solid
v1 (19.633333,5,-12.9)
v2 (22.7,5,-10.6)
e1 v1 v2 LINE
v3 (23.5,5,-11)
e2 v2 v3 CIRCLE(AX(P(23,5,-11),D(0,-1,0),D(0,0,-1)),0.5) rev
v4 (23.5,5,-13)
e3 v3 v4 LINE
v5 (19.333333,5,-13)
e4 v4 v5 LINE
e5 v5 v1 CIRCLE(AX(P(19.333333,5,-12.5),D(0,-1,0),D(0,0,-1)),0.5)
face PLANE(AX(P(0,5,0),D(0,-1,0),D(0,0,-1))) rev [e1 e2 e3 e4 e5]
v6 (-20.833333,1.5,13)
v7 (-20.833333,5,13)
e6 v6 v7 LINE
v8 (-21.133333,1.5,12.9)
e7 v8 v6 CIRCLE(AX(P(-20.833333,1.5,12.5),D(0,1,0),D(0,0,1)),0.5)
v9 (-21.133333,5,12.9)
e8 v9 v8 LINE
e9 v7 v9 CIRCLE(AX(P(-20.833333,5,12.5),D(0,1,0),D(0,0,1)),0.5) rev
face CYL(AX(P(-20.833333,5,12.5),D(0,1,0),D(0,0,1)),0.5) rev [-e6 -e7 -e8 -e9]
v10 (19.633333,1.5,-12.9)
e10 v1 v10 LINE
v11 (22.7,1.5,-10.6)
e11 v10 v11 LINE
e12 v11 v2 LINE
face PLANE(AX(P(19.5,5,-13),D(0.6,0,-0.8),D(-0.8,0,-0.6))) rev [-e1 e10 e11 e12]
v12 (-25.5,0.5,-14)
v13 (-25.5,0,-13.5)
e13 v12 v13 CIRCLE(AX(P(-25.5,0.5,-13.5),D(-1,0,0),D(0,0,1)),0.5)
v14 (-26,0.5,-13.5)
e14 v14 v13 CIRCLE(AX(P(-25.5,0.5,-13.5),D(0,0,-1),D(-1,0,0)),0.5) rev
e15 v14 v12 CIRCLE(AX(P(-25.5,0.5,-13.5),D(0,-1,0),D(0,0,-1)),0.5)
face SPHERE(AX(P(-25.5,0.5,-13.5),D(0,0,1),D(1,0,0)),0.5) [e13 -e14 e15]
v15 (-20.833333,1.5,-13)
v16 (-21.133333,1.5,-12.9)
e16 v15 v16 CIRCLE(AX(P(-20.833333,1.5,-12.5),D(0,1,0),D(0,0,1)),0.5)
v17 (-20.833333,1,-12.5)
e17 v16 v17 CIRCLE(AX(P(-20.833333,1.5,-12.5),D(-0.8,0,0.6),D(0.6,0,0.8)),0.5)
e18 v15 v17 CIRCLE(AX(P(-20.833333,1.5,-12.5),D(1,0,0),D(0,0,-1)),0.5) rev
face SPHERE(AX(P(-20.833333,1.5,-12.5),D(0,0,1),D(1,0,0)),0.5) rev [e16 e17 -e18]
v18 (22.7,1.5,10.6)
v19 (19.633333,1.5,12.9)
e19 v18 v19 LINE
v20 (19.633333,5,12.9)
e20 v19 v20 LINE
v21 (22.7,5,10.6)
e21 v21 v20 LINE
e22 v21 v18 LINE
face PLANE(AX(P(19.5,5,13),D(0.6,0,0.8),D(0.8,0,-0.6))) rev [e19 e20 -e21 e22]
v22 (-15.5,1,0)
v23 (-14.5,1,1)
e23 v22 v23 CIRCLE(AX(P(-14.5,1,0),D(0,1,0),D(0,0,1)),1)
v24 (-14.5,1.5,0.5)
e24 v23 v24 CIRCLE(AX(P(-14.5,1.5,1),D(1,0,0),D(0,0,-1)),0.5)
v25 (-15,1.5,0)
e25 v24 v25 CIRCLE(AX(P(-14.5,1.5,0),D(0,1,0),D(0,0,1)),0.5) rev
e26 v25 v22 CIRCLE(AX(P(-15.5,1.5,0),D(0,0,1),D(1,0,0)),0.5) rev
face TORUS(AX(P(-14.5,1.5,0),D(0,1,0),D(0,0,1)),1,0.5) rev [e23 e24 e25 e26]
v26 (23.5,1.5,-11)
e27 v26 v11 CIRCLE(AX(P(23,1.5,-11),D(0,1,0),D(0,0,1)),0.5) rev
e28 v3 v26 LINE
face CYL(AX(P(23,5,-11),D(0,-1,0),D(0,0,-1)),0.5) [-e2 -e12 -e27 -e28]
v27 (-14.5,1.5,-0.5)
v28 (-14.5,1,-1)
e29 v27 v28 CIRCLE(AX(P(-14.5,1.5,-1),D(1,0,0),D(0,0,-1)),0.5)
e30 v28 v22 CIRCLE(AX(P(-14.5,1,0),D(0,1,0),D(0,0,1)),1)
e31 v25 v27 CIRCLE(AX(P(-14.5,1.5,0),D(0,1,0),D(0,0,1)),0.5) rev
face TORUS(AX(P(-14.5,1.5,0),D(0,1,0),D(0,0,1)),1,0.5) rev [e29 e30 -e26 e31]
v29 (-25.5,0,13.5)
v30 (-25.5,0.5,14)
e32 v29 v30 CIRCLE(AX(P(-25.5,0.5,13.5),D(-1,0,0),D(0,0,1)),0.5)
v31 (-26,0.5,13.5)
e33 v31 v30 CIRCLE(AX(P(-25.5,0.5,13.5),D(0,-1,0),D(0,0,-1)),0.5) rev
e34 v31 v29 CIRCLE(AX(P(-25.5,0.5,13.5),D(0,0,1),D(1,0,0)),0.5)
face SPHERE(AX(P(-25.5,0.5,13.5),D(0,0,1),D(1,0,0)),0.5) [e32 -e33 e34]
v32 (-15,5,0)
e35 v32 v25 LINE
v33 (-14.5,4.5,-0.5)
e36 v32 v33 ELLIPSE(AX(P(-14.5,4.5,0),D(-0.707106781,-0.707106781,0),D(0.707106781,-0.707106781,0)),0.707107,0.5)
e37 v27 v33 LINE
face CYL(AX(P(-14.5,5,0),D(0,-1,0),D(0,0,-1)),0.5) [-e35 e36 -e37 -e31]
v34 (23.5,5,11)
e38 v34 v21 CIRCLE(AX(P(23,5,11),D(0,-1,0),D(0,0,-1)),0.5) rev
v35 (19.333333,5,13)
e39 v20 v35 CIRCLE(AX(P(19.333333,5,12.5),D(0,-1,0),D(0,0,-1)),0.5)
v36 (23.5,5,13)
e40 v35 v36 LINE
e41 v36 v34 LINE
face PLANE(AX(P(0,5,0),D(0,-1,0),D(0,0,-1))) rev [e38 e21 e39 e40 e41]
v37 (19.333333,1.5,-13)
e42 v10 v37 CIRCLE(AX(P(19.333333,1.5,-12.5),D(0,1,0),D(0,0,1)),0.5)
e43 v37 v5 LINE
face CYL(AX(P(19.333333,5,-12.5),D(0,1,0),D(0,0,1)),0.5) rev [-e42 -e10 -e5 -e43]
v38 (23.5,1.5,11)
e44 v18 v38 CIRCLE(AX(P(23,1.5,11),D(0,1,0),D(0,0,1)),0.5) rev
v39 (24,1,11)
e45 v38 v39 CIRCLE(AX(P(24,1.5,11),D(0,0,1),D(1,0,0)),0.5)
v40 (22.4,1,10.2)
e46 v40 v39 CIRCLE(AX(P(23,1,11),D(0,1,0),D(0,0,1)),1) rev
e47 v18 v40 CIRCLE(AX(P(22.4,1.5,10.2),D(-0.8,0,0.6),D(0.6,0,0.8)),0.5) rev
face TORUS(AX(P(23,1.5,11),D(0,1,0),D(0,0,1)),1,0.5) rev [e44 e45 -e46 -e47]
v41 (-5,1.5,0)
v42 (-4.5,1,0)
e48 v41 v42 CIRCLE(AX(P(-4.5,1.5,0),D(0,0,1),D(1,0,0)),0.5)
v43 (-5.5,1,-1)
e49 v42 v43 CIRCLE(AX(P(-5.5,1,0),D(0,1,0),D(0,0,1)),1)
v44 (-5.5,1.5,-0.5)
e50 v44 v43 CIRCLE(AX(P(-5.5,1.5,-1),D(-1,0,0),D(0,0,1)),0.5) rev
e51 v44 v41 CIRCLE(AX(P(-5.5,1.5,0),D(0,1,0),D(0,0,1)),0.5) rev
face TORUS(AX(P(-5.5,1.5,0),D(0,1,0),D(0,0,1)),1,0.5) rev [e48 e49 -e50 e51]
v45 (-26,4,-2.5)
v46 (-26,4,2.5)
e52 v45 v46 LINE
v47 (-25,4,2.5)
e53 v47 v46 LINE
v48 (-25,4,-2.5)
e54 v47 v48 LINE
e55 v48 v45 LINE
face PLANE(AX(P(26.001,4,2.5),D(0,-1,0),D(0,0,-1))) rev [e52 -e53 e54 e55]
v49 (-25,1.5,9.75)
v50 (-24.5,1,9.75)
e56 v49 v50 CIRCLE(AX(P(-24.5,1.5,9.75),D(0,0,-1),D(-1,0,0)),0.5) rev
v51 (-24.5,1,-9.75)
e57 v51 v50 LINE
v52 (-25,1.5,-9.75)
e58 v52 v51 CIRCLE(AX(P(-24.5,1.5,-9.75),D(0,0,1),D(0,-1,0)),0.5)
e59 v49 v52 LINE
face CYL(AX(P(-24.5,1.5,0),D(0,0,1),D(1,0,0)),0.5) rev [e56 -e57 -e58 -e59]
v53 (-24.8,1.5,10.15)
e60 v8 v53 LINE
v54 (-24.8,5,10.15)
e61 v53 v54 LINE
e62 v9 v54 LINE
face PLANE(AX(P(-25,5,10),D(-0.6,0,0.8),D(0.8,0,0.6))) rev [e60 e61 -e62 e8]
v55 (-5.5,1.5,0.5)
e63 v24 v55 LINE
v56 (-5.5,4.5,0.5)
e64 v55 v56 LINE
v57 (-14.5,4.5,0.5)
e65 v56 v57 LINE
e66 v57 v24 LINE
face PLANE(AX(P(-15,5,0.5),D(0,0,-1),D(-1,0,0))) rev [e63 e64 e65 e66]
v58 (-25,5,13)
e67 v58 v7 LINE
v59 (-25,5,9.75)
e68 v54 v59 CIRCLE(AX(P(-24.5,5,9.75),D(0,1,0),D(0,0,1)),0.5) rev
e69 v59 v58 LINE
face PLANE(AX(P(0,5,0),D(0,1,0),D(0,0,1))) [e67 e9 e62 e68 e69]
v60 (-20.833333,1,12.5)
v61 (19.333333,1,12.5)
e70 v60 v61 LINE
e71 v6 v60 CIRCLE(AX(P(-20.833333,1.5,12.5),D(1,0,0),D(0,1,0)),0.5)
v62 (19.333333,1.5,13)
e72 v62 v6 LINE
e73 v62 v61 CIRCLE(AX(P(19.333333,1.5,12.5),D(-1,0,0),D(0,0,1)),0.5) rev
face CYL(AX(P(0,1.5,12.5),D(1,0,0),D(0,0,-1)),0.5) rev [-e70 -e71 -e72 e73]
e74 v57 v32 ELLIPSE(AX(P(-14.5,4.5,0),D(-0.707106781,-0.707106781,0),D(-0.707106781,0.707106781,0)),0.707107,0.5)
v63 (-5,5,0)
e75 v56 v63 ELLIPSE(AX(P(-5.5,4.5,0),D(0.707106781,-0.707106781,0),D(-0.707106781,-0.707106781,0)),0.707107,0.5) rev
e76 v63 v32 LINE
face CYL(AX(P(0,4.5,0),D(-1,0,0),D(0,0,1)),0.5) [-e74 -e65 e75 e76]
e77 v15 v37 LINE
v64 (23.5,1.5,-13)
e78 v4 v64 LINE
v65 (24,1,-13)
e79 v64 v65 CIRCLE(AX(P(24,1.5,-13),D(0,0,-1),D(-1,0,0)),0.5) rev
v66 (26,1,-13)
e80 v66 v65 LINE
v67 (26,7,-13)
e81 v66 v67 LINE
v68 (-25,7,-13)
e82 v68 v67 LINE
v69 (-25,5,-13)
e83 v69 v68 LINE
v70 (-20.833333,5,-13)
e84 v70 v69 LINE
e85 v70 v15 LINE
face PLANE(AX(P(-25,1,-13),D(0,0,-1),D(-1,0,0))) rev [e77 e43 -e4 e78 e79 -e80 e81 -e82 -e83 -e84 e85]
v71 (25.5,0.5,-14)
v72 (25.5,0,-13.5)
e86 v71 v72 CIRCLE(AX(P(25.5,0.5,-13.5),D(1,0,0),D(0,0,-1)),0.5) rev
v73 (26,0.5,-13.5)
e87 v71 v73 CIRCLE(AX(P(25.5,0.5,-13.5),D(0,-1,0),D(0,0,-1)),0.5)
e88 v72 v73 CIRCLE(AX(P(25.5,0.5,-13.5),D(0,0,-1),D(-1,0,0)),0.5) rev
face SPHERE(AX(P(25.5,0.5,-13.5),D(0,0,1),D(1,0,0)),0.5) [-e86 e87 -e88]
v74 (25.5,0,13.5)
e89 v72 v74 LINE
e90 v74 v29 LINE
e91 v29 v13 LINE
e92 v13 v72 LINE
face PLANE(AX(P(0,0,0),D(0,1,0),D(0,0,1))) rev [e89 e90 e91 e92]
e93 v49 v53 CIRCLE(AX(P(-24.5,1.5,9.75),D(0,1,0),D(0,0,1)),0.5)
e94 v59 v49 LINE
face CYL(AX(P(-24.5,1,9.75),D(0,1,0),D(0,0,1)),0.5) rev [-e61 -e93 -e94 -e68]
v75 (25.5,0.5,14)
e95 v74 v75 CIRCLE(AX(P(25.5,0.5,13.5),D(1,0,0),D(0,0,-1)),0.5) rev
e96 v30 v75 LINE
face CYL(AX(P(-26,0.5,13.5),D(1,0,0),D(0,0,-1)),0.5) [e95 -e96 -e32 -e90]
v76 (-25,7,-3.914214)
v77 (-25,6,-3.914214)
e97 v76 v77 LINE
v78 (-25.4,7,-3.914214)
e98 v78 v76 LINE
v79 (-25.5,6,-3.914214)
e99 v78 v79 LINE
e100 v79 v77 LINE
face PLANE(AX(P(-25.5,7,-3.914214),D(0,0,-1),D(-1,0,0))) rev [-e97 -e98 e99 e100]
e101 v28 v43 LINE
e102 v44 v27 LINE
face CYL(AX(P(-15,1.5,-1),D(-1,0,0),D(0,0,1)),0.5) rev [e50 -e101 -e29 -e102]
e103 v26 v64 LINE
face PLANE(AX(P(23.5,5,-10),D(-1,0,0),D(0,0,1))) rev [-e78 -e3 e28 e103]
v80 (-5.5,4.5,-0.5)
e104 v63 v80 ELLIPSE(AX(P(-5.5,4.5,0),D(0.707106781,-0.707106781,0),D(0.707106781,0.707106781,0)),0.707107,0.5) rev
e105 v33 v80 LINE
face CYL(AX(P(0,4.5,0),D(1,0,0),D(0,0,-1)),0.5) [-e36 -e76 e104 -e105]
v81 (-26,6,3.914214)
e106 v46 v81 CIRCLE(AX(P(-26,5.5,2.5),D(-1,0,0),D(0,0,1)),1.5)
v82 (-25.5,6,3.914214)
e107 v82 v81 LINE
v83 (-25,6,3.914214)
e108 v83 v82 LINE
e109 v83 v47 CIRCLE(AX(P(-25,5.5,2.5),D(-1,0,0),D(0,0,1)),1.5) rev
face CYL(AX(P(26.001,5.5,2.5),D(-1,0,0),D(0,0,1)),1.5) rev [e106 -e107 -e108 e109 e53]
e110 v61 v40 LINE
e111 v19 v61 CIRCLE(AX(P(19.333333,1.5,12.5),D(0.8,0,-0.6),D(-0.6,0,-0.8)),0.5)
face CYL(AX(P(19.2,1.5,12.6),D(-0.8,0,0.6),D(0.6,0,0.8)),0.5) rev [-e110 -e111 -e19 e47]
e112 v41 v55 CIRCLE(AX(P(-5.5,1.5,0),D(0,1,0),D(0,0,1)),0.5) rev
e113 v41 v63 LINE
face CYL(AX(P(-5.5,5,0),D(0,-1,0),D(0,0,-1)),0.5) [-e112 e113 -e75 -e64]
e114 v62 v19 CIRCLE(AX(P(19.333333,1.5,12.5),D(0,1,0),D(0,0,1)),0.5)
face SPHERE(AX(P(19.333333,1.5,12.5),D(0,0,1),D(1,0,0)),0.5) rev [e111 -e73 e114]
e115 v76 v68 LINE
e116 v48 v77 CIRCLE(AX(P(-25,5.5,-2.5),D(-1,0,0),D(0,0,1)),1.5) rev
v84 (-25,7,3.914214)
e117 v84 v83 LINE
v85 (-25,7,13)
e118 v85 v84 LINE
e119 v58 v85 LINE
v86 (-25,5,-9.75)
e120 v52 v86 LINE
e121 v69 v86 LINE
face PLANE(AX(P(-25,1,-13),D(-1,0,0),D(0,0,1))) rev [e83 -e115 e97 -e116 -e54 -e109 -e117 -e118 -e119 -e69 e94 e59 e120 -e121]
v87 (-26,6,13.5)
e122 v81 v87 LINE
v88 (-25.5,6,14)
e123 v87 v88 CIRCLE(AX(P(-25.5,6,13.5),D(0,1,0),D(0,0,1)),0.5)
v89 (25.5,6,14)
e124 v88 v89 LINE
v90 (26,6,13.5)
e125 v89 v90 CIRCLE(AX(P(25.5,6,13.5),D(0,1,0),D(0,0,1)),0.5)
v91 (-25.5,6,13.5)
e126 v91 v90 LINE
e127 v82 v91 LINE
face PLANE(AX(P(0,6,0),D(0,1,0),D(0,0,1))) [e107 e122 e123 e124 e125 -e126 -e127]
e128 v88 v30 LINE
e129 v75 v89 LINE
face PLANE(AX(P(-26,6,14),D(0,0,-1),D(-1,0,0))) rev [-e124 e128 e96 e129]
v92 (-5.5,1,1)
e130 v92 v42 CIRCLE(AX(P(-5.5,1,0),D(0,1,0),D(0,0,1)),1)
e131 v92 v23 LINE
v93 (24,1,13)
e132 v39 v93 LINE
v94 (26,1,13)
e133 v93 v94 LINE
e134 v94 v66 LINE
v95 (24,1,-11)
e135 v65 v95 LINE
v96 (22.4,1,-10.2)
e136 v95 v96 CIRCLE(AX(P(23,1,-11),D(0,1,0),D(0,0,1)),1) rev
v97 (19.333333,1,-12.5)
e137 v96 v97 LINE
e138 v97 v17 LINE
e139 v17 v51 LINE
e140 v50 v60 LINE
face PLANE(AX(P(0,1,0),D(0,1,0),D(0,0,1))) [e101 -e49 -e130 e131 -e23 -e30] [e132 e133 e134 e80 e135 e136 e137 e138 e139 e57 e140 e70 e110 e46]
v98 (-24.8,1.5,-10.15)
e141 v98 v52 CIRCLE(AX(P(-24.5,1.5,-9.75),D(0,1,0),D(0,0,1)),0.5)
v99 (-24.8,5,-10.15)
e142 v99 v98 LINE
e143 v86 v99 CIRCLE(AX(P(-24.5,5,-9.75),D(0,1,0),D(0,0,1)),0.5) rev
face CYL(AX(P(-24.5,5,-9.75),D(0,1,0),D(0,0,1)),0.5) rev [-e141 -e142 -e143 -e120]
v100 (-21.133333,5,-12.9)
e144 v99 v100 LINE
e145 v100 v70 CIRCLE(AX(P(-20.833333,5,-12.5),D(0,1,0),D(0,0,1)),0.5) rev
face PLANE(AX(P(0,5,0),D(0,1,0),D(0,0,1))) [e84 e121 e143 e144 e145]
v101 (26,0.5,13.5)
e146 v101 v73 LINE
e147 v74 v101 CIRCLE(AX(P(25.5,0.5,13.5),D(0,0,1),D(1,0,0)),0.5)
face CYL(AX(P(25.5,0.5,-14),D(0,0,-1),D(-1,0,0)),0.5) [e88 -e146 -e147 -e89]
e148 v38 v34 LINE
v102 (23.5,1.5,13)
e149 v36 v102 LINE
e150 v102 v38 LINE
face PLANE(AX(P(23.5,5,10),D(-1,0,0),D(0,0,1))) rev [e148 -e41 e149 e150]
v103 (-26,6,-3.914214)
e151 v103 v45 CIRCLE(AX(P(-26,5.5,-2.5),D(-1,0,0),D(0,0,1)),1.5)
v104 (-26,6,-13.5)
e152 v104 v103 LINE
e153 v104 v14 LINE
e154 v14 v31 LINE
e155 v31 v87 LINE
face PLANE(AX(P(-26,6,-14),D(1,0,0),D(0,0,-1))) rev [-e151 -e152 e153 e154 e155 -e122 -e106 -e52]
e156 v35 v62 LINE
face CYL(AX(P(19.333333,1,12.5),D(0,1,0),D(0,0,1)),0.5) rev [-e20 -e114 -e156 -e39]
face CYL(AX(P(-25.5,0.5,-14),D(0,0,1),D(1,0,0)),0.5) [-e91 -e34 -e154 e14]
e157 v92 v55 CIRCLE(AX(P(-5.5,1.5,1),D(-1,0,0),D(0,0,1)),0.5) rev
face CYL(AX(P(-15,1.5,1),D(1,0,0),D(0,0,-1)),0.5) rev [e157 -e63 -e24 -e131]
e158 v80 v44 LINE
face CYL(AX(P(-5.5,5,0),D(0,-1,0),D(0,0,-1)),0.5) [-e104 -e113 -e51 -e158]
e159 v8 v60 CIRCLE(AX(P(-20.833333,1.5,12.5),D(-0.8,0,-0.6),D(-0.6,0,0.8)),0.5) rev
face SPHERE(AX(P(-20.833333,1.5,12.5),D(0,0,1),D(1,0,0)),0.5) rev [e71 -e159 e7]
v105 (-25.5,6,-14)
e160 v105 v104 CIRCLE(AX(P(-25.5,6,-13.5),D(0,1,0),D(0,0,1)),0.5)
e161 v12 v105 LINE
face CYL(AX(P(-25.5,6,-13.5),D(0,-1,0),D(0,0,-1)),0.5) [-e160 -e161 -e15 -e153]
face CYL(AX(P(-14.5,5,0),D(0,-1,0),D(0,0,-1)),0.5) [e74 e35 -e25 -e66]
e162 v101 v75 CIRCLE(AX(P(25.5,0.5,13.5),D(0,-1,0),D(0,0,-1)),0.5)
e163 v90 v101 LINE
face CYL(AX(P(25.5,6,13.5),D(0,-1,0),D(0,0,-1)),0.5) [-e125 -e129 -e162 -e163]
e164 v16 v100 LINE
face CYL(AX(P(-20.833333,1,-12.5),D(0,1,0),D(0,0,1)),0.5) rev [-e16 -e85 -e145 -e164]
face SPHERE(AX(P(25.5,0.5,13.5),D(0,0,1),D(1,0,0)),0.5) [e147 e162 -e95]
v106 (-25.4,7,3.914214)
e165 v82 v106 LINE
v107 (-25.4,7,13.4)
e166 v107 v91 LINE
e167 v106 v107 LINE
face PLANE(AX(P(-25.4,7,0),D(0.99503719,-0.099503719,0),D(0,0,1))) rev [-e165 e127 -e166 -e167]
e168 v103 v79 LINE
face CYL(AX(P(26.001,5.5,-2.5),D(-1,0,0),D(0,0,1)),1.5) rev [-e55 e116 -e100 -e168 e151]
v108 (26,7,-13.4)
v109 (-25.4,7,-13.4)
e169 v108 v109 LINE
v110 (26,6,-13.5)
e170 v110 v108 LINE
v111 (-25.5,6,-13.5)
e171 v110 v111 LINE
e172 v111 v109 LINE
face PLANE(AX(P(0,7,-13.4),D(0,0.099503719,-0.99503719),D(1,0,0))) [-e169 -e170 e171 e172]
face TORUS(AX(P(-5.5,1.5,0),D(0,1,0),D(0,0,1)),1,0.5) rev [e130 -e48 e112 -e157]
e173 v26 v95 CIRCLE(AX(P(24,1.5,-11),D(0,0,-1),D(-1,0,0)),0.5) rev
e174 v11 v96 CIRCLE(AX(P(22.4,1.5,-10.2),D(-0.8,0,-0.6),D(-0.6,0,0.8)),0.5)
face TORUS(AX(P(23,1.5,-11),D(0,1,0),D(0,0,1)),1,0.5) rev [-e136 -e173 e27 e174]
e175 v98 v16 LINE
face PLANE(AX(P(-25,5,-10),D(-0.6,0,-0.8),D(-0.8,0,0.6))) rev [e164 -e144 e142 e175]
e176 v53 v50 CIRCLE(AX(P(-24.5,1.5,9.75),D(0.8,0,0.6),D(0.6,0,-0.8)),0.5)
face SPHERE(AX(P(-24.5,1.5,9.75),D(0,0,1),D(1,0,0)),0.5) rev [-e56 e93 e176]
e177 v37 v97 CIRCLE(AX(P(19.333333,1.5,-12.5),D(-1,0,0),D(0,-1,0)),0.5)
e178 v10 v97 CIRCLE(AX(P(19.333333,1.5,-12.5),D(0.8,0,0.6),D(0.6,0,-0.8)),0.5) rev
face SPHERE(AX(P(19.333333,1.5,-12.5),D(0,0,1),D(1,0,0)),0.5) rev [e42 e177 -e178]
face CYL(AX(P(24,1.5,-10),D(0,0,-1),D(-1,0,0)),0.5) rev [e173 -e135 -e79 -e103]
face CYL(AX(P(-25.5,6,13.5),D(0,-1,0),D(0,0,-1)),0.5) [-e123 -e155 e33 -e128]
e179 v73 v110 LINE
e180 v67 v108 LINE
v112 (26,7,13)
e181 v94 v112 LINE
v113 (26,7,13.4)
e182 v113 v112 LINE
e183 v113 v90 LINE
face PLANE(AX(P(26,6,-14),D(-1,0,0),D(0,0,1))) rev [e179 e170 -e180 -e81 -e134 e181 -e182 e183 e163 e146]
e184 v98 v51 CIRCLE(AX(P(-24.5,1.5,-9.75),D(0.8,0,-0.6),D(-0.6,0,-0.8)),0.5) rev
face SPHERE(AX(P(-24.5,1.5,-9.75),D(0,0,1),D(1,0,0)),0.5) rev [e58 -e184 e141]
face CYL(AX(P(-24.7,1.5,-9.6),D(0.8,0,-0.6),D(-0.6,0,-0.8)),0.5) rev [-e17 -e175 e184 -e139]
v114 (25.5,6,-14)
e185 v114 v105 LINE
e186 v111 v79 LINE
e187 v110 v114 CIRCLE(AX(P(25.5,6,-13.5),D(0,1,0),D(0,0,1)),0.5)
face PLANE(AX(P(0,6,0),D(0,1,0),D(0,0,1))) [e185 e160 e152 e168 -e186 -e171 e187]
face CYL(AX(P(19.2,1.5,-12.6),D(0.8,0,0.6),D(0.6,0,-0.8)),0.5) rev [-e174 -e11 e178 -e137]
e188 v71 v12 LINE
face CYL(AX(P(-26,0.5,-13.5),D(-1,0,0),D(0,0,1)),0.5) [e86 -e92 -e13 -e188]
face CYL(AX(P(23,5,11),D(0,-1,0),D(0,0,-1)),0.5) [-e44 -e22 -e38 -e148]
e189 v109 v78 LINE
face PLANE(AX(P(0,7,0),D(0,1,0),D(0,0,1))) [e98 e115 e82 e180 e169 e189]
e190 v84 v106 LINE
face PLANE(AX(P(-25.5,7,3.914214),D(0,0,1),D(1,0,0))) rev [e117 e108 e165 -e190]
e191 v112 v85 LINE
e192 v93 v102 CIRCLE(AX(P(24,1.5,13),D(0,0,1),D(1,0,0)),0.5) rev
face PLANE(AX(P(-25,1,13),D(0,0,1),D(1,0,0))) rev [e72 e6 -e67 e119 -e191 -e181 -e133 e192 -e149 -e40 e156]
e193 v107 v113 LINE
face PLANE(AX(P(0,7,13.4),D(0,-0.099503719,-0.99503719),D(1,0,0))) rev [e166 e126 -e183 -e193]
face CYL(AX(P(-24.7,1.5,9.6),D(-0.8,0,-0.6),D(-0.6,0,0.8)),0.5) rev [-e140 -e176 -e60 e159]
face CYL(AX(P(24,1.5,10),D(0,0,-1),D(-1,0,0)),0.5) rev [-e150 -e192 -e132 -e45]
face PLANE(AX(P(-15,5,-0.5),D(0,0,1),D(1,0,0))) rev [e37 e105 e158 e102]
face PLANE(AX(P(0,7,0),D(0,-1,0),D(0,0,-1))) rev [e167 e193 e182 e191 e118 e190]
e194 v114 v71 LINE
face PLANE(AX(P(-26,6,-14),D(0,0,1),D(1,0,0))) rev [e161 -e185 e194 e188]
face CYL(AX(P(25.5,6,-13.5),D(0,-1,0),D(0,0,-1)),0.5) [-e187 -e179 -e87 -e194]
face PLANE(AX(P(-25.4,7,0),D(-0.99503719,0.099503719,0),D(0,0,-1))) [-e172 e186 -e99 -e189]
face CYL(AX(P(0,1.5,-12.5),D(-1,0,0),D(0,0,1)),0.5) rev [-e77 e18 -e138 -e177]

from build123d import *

# Parameters (mm, degrees)
SKETCH_1_W          = 52
SKETCH_1_H          = 28
EXTRUDE_1_DEPTH     = 6
SKETCH_3_W          = 51
SKETCH_3_H          = 26
CUT_EXTRUDE_1_DEPTH = 5
SKETCH_4_W          = 10
SKETCH_4_H          = 1
EXTRUDE_2_DEPTH     = 4
CUT_EXTRUDE_2_REACH = 56.185
FILLET_1_R          = 0.5
EXTRUDE_3_DEPTH     = 1
CHAMFER_1_SIZE      = 0.1
CHAMFER_1_SIZE_2    = 1


# Some blends are built 0.0001 mm under size
with BuildPart() as part:
    # Эскиз1 → Бобышка-Вытянуть1 (new body)
    with BuildSketch(Plane(origin=(0, 0, 0), x_dir=(1, 0, 0), z_dir=(0, 1, 0))):
        Rectangle(SKETCH_1_W, SKETCH_1_H)
    extrude(amount=EXTRUDE_1_DEPTH)

    # Эскиз3 → Вырез-Вытянуть1 (cut)
    with BuildSketch(Plane(origin=(0, 6, 0), x_dir=(1, 0, 0), z_dir=(0, 1, 0))):
        with Locations((0.5, 0)):
            Rectangle(SKETCH_3_W, SKETCH_3_H)
    extrude(amount=-CUT_EXTRUDE_1_DEPTH, mode=Mode.SUBTRACT)

    # Эскиз4 → Бобышка-Вытянуть2 (add)
    with BuildSketch(Plane(origin=(0, 1, 0), x_dir=(1, 0, 0), z_dir=(0, 1, 0))):
        Polygon((19.5, 13), (23.5, 10), (23.5, 13), align=None)
        Polygon((-25, 13), (-25, 10), (-21, 13), align=None)
        Polygon((-21, -13), (-25, -13), (-25, -10), align=None)
        Polygon((23.5, -13), (19.5, -13), (23.5, -10), align=None)
        with Locations((-10, 0)):
            Rectangle(SKETCH_4_W, SKETCH_4_H)
    extrude(amount=EXTRUDE_2_DEPTH)

    # Эскиз5 → Вырез-Вытянуть2 (cut, up to next)
    with BuildSketch(Plane.ZY.offset(26), mode=Mode.PRIVATE) as cut_extrude_2_sk1:
        with BuildLine():
            Line((2.5, 4), (-2.5, 4))
            ThreePointArc((-2.5, 4), (-4, 5.5), (-2.5, 7))
            Line((-2.5, 7), (2.5, 7))
            ThreePointArc((2.5, 7), (4, 5.5), (2.5, 4))
        make_face()
    cut_extrude_2_tool1 = extrude(cut_extrude_2_sk1.sketch, amount=-CUT_EXTRUDE_2_REACH, mode=Mode.PRIVATE) & part.part
    add(cut_extrude_2_tool1.solids().sort_by_distance((-26, 5.5, 0))[0], mode=Mode.SUBTRACT)

    # Скругление1
    fillet_1_edges = [part.edges().sort_by_distance(p)[0] for p in [
        (-26, 3, -14),
        (26, 3, -14),
        (0, 0, -14),
        (-26, 0, 0),
        (-26, 3, 14),
        (26, 0, 0),
        (26, 3, 14),
        (0, 0, 14),
        (-21, 3, 13),
        (-0.75, 1, 13),
        (19.5, 3, 13),
        (-23, 1, -11.5),
        (-25, 1, 0),
        (-23, 1, 11.5),
        (21.5, 1, 11.5),
        (23.5, 1, 11.5),
        (23.5, 1, -11.5),
        (21.5, 1, -11.5),
        (-0.75, 1, -13),
        (-10, 1, -0.5),
        (-5, 1, 0),
        (-10, 1, 0.5),
        (-15, 1, 0),
        (19.5, 3, -13),
        (-21, 3, -13),
        (-25, 3, -10),
        (-25, 3, 10),
        (23.5, 3, 10),
        (23.5, 3, -10),
        (-15, 3, -0.5),
        (-5, 3, -0.5),
        (-10, 5, -0.5),
        (-5, 3, 0.5),
        (-15, 3, 0.5),
        (-10, 5, 0.5),
    ]]
    fillet(fillet_1_edges, radius=FILLET_1_R - 0.0001)  # a hair under: the kernel refuses the full size

    # Эскиз6 → Бобышка-Вытянуть3 (add)
    with BuildSketch(Plane(origin=(0, 6, 0), x_dir=(1, 0, 0), z_dir=(0, 1, 0))):
        Polygon((-25.5, 3.914213562), (-25, 3.914213562), (-25, 13), (26, 13), (26, 13.5), (-25.5, 13.5), align=None)
        Polygon((-25.5, -13.5), (-25.5, -3.914213562), (-25, -3.914213562), (-25, -13), (26, -13), (26, -13.5), align=None)
    extrude(amount=EXTRUDE_3_DEPTH)

    # Фаска1
    # the kernel refuses this chamfer: 1, 0.1 mm, written as the material it takes off along each edge
    with BuildSketch(Plane(origin=(28.599522763, 7, 13.5), x_dir=(0, 0.3574851447578448, -0.9339188247794681), z_dir=(-1, 0, 0))) as chamfer_1_piece_1_section:
        Polygon((CHAMFER_1_SIZE * 0.933918824779, CHAMFER_1_SIZE * 0.357485144758), (-CHAMFER_1_SIZE_2 * 0.357485144758, CHAMFER_1_SIZE_2 * 0.933918824779), (0, 0), align=None)
    chamfer_1_piece_1 = extrude(amount=56.699045526, mode=Mode.PRIVATE)
    chamfer_1_piece_1 = split(chamfer_1_piece_1, bisect_by=Plane(origin=(0.25, 6, 13.477938847), z_dir=(0, 1, 0)), keep=Keep.TOP, mode=Mode.PRIVATE)
    add(chamfer_1_piece_1, mode=Mode.SUBTRACT)
    with BuildSketch(Plane(origin=(-25.5, 7, 16.099522763), x_dir=(-0.003827768713514726, -0.9999926740665033, 0), z_dir=(0, 0, -1))) as chamfer_1_piece_2_section:
        Polygon((CHAMFER_1_SIZE_2 * 0.999992674067, -CHAMFER_1_SIZE_2 * 0.00382776871351), (-CHAMFER_1_SIZE * 0.00382776871351, -CHAMFER_1_SIZE * 0.999992674067), (0, 0), align=None)
    chamfer_1_piece_2 = extrude(amount=14.784831964, mode=Mode.PRIVATE)
    chamfer_1_piece_2 = split(chamfer_1_piece_2, bisect_by=Plane(origin=(-25.477938847, 6, 8.707106781), z_dir=(0, 1, 0)), keep=Keep.TOP, mode=Mode.PRIVATE)
    add(chamfer_1_piece_2, mode=Mode.SUBTRACT)
    with BuildSketch(Plane(origin=(28.599522763, 7, -13.5), x_dir=(0, 0.3574851447578448, 0.9339188247794681), z_dir=(-1, 0, 0))) as chamfer_1_piece_3_section:
        Polygon((CHAMFER_1_SIZE * 0.933918824779, -CHAMFER_1_SIZE * 0.357485144758), (-CHAMFER_1_SIZE_2 * 0.357485144758, -CHAMFER_1_SIZE_2 * 0.933918824779), (0, 0), align=None)
    chamfer_1_piece_3 = extrude(amount=56.699045526, mode=Mode.PRIVATE)
    chamfer_1_piece_3 = split(chamfer_1_piece_3, bisect_by=Plane(origin=(0.25, 6, -13.477938847), z_dir=(0, 1, 0)), keep=Keep.TOP, mode=Mode.PRIVATE)
    add(chamfer_1_piece_3, mode=Mode.SUBTRACT)
    with BuildSketch(Plane(origin=(-25.5, 7, -16.099522763), x_dir=(0.9339188247794681, 0.3574851447578448, 0), z_dir=(0, 0, 1))) as chamfer_1_piece_4_section:
        Polygon((CHAMFER_1_SIZE * 0.933918824779, -CHAMFER_1_SIZE * 0.357485144758), (-CHAMFER_1_SIZE_2 * 0.357485144758, -CHAMFER_1_SIZE_2 * 0.933918824779), (0, 0), align=None)
    chamfer_1_piece_4 = extrude(amount=14.784831964, mode=Mode.PRIVATE)
    chamfer_1_piece_4 = split(chamfer_1_piece_4, bisect_by=Plane(origin=(-25.477938847, 6, -8.707106781), z_dir=(0, 1, 0)), keep=Keep.TOP, mode=Mode.PRIVATE)
    add(chamfer_1_piece_4, mode=Mode.SUBTRACT)


solid = part.part
